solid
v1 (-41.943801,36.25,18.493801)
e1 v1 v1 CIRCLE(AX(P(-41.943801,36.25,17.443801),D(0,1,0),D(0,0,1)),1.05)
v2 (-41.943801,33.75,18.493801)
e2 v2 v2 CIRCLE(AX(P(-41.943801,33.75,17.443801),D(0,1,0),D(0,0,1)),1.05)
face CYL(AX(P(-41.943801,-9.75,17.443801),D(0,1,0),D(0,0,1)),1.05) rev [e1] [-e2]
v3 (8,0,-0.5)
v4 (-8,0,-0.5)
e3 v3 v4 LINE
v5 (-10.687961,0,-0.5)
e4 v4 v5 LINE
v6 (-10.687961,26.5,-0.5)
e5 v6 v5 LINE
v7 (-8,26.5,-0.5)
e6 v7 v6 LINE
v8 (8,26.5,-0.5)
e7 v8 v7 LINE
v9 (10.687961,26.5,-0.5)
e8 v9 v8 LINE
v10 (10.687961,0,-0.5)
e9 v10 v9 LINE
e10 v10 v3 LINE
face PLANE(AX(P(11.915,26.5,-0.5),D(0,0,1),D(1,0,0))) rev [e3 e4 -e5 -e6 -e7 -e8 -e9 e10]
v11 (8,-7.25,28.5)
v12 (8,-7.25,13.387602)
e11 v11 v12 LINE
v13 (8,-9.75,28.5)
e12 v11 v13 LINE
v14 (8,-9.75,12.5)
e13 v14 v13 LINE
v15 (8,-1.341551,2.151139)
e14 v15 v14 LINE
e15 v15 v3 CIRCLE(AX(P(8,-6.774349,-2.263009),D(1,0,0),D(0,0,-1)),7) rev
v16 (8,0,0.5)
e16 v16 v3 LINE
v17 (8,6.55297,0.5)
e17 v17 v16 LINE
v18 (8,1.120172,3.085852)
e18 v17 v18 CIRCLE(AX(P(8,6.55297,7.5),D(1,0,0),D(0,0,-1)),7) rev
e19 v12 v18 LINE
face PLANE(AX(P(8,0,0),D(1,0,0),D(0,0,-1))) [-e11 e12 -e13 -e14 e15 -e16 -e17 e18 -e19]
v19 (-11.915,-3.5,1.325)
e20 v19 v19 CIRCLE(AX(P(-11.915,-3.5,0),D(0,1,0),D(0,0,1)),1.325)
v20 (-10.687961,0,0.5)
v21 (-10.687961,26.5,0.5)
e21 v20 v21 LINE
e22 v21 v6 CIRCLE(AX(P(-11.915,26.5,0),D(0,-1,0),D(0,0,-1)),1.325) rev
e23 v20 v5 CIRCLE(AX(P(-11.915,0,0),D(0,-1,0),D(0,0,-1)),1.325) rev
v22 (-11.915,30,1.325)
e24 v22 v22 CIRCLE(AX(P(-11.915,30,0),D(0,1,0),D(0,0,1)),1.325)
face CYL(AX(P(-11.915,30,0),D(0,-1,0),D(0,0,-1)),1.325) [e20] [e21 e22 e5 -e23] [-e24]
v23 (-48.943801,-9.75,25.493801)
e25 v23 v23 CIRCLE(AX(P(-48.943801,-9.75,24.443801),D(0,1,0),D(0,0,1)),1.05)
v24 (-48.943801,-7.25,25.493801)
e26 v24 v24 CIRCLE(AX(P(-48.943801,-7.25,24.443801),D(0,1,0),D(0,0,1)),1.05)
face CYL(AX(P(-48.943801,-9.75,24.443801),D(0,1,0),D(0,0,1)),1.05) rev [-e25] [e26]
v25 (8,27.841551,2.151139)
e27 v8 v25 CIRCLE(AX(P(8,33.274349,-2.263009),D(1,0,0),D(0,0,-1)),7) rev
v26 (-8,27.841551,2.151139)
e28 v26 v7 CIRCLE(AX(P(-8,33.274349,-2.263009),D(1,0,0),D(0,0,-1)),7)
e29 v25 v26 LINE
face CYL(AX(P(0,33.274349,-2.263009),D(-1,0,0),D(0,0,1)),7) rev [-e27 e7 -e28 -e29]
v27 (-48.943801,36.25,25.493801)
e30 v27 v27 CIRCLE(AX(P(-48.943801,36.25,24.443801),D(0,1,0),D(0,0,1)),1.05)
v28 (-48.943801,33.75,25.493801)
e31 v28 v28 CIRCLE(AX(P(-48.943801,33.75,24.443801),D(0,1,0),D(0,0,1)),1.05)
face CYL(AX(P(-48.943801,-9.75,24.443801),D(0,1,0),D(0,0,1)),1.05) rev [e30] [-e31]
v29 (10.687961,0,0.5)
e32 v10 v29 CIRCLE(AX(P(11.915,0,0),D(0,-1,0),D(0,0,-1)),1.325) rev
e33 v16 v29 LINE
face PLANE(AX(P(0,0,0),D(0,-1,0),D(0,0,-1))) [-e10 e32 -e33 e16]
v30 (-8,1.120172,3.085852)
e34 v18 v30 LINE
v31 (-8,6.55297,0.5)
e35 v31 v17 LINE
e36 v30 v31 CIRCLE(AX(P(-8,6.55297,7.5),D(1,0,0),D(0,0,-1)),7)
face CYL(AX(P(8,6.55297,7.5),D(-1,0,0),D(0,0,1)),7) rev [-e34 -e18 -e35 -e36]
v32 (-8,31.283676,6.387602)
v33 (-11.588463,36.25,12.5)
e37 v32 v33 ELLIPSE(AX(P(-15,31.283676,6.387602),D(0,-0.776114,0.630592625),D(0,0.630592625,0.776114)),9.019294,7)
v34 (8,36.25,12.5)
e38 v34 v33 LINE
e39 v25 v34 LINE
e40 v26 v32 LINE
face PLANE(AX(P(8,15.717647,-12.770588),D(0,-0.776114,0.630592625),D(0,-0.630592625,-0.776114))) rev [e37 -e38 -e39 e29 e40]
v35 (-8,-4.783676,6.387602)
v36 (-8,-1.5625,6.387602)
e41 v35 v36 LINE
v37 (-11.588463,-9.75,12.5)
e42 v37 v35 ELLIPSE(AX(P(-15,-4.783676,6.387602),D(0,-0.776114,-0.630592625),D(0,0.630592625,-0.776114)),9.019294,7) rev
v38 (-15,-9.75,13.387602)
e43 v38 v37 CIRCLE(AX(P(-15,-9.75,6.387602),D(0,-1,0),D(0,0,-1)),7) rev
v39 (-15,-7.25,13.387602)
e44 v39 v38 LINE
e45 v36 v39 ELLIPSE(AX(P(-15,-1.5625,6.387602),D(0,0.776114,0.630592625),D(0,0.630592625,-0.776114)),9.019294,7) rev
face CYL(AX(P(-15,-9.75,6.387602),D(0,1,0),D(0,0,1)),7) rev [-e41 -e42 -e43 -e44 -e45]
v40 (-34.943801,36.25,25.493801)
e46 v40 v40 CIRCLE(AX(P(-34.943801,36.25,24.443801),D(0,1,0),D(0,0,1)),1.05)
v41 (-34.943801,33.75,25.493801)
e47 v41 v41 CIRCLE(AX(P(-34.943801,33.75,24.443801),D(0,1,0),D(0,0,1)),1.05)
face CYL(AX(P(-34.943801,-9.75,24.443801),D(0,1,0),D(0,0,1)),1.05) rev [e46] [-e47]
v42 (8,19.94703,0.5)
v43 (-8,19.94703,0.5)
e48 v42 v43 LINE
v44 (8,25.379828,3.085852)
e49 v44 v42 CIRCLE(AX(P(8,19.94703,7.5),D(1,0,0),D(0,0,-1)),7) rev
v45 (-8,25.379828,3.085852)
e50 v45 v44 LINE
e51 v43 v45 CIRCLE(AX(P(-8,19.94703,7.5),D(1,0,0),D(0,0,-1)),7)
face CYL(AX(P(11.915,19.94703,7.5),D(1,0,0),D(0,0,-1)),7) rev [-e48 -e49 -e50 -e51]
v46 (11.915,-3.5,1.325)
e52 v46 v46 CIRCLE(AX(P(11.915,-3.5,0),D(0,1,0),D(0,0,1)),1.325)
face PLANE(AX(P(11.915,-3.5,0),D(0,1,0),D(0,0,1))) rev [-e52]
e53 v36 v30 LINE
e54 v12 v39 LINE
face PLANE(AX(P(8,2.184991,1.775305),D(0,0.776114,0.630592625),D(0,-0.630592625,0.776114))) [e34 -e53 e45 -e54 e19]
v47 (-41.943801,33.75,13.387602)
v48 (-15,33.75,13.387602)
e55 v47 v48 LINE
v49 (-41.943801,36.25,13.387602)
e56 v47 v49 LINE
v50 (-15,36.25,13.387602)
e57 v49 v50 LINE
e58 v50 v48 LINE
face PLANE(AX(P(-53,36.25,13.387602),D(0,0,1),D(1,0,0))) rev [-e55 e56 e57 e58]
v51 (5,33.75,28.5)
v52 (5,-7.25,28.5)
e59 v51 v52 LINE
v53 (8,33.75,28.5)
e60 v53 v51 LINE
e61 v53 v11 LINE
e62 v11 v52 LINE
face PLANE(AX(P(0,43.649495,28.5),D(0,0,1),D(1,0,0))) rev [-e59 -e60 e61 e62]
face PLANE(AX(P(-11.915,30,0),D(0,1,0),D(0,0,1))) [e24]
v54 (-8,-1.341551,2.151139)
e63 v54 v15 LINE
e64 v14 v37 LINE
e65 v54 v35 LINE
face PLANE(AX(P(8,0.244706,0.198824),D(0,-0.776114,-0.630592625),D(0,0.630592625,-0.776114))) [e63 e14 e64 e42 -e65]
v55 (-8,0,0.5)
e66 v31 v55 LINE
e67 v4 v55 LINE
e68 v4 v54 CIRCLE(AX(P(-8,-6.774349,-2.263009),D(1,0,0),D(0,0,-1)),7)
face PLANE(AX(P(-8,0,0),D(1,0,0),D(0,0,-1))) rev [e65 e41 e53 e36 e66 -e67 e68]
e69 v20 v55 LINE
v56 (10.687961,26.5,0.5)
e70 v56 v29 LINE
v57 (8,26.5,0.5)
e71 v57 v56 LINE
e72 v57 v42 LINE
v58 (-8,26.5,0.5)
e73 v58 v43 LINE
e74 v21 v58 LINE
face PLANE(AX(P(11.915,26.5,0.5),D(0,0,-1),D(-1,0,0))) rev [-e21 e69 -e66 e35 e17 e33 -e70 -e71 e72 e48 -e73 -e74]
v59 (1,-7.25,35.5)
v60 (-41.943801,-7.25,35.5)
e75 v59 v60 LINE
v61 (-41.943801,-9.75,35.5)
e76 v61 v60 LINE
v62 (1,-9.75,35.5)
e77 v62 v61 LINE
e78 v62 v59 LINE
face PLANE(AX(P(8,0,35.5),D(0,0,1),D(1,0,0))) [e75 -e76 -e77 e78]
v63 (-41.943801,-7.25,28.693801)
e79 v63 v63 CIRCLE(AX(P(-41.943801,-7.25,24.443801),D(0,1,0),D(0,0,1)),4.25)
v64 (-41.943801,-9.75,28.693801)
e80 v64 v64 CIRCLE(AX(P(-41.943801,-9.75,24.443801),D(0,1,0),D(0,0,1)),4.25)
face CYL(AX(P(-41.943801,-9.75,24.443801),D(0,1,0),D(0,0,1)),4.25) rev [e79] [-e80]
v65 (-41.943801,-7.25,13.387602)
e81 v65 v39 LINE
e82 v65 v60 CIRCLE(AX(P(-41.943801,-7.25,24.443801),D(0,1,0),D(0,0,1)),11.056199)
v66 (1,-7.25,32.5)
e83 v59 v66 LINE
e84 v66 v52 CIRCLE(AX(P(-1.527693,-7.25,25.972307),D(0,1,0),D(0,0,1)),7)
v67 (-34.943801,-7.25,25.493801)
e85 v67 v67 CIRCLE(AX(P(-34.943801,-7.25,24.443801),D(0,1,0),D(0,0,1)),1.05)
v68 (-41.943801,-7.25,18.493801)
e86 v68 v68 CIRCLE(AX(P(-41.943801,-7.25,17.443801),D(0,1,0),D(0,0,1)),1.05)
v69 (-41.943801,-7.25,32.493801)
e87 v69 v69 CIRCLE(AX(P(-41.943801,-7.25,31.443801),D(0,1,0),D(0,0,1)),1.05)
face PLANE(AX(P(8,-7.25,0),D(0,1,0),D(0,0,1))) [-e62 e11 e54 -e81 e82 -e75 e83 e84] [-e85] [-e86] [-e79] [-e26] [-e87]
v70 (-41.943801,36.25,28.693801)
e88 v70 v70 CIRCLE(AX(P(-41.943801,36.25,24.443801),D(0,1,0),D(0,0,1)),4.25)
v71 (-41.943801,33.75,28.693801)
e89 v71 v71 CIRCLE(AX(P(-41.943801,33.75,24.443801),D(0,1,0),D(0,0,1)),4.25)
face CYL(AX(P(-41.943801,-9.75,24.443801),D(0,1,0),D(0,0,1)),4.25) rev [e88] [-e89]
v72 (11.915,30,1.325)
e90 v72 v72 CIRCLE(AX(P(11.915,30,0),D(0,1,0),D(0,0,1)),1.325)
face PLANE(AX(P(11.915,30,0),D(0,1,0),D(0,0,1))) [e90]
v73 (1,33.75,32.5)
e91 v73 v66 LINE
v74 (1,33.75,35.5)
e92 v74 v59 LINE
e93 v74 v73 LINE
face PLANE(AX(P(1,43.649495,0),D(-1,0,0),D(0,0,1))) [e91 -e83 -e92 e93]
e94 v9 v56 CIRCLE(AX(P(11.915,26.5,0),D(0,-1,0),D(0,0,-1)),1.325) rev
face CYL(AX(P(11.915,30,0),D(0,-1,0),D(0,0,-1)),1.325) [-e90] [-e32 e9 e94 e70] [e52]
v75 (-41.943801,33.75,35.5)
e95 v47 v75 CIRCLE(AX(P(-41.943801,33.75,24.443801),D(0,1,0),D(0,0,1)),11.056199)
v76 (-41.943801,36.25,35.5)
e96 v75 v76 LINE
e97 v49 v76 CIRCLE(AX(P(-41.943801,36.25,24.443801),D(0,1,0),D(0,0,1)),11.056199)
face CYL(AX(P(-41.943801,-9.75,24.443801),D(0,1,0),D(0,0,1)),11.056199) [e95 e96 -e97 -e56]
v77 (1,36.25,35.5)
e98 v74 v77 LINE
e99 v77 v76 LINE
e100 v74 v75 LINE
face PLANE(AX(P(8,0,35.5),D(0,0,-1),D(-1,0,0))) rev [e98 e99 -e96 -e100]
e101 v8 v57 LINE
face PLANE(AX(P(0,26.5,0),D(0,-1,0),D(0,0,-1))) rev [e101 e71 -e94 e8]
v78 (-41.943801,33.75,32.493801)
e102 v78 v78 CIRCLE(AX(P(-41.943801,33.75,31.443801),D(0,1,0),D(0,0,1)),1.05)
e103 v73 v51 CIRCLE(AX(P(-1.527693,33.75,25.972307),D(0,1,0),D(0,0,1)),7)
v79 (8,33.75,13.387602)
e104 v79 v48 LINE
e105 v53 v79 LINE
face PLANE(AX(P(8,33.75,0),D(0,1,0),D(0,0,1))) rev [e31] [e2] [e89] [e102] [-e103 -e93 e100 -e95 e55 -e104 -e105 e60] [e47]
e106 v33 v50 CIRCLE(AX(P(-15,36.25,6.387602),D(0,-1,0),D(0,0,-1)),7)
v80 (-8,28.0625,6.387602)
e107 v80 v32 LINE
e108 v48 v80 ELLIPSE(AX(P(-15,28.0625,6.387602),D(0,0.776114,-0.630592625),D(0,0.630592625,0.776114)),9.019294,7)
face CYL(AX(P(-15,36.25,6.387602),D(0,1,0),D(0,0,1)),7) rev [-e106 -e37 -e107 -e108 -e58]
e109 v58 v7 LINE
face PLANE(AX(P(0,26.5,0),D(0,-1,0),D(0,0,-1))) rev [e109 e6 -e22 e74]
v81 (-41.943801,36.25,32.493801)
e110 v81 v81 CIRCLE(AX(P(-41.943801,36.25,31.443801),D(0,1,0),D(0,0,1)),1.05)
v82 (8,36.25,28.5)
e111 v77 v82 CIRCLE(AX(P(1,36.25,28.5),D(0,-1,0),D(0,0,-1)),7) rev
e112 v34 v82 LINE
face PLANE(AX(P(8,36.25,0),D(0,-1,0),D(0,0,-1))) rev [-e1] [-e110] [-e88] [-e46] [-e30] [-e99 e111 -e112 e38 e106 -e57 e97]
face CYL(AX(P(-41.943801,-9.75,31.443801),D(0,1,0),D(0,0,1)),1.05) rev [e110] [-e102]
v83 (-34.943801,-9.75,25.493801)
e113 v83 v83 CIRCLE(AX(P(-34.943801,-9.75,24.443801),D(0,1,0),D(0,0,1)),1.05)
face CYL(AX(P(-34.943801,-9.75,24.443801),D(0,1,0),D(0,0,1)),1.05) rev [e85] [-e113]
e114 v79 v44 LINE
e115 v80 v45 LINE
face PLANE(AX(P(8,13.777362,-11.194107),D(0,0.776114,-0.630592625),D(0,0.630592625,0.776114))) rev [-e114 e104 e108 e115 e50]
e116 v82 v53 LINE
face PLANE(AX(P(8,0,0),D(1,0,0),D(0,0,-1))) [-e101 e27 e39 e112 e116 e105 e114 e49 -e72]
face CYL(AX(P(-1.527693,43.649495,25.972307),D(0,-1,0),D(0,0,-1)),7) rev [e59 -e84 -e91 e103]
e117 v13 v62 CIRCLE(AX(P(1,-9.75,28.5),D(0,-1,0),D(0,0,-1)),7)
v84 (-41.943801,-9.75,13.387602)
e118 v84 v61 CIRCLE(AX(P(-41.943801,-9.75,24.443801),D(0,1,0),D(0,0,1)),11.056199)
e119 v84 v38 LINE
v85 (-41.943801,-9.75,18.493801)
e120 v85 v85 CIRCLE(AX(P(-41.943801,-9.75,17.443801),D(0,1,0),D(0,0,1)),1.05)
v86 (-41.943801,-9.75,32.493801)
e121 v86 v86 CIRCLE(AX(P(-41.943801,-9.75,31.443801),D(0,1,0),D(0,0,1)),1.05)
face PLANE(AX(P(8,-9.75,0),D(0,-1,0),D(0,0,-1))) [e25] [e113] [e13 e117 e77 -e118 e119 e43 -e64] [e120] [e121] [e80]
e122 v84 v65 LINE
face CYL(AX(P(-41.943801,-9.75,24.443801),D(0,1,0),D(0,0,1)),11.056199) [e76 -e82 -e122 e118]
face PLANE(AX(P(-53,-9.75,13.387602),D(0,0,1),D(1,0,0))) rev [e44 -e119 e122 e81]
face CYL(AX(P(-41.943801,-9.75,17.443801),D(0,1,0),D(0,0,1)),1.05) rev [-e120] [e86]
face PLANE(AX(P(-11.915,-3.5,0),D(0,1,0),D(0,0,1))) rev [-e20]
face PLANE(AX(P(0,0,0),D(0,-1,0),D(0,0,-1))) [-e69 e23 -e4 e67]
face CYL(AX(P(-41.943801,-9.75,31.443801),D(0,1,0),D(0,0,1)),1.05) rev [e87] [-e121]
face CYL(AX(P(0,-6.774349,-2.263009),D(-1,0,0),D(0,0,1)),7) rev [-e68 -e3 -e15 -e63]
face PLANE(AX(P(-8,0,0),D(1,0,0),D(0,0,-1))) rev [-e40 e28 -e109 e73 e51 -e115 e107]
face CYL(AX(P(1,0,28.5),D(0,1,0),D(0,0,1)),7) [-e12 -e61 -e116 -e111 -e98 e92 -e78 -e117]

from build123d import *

# Parameters (mm, degrees)
SKETCH1_W           = 23.83
SKETCH1_H           = 1
BOSS_EXTRUDE1_DEPTH = 26.5
SKETCH2_R           = 1.325
BOSS_EXTRUDE2_DEPTH = 16.75
BOSS_EXTRUDE4_DEPTH = 8
SKETCH5_W           = 22.112398437
SKETCH5_H           = 2.5
BOSS_EXTRUDE5_DEPTH = 45
SKETCH6_R           = 4.25
SKETCH6_R_2         = 1.05
CUT_EXTRUDE1_DEPTH  = 79.646360374
FILLET1_R           = 7
FILLET2_R           = 7
FILLET3_R           = 7
BOSS_EXTRUDE6_START = 41
BOSS_EXTRUDE6_DEPTH = 41


with BuildPart() as part:
    # Sketch1 → Boss-Extrude1 (new body)
    with BuildSketch(Plane(origin=(0, 0, 0), x_dir=(1, 0, 0), z_dir=(0, 1, 0))):
        Rectangle(SKETCH1_W, SKETCH1_H)
    extrude(amount=BOSS_EXTRUDE1_DEPTH)

    # Sketch2 → Boss-Extrude2 (add, symmetric)
    with BuildSketch(Plane(origin=(0, 13.25, 0), x_dir=(1, 0, 0), z_dir=(0, 1, 0))):
        with Locations(Location((-11.915, 0, 0), (0, 0, 270))):
            Circle(SKETCH2_R)
        with Locations(Location((11.915, 0, 0), (0, 0, 270))):
            Circle(SKETCH2_R)
    extrude(amount=BOSS_EXTRUDE2_DEPTH, both=True)

    # Sketch4 → Boss-Extrude4 (add, symmetric)
    with BuildSketch(Plane(origin=(0, 0, 0), x_dir=(0, 0, -1), z_dir=(1, 0, 0))):
        Polygon((-0.5, 23.27882373), (-0.5, 26.5), (-12.5, 36.25), (-35.5, 36.25), (-35.5, 33.75), (-13.387601563, 33.75), align=None)
        Polygon((-0.5, 0), (-0.5, 3.22117627), (-13.387601563, -7.25), (-35.5, -7.25), (-35.5, -9.75), (-12.5, -9.75), align=None)
    extrude(amount=BOSS_EXTRUDE4_DEPTH, both=True)

    # Sketch5 → Boss-Extrude5 (add)
    with BuildSketch(Plane.ZY.offset(8)):
        with Locations((24.443800782, 35)):
            Rectangle(SKETCH5_W, SKETCH5_H)
        with Locations((24.443800782, -8.5)):
            Rectangle(SKETCH5_W, SKETCH5_H)
    extrude(amount=BOSS_EXTRUDE5_DEPTH)

    # Sketch6 → Cut-Extrude1 (cut, through all)
    with BuildSketch(Plane(origin=(0, 36.25, 0), x_dir=(1, 0, 0), z_dir=(0, 1, 0))):
        with Locations(Location((-41.943800782, -24.443800782, 0), (0, 0, 270))):
            Circle(SKETCH6_R)
        with Locations(Location((-48.943800782, -24.443800782, 0), (0, 0, 270))):
            Circle(SKETCH6_R_2)
        with Locations(Location((-41.943800782, -17.443800782, 0), (0, 0, 270))):
            Circle(SKETCH6_R_2)
        with Locations(Location((-34.943800782, -24.443800782, 0), (0, 0, 270))):
            Circle(SKETCH6_R_2)
        with Locations(Location((-41.943800782, -31.443800782, 0), (0, 0, 270))):
            Circle(SKETCH6_R_2)
        with BuildLine():
            ThreePointArc((-53, -24.443800782), (-49.761714223, -16.62588734), (-41.943800782, -13.387601563))
            Line((-41.943800782, -13.387601563), (-53, -13.387601563))
            Line((-53, -13.387601563), (-53, -24.443800782))
        make_face()
        with BuildLine():
            ThreePointArc((-41.943800782, -35.5), (-49.761714223, -32.261714223), (-53, -24.443800782))
            Line((-53, -24.443800782), (-53, -35.5))
            Line((-53, -35.5), (-41.943800782, -35.5))
        make_face()
    extrude(amount=-CUT_EXTRUDE1_DEPTH, mode=Mode.SUBTRACT)

    # Fillet1
    # the kernel refuses this fillet: 7 mm, written as the material it adds along each edge
    with BuildSketch(Plane(origin=(-8, -9.75, 13.387601563), x_dir=(-1, 0, 0), z_dir=(0, 1, 0))) as fillet1_piece_1_section:
        with BuildLine():
            CenterArc((FILLET1_R, -FILLET1_R), FILLET1_R, 90, 90)
            Line((0, -FILLET1_R), (0, 0))
            Line((0, 0), (FILLET1_R, 0))
        make_face()
    fillet1_piece_1 = extrude(amount=2.5, mode=Mode.PRIVATE)
    fillet1_piece_1 = split(fillet1_piece_1, bisect_by=Plane(origin=(-9.983413871, -9.198966646, 11.821805103), z_dir=(0, 0.7761140001162655, 0.6305926250944658)), keep=Keep.TOP, mode=Mode.PRIVATE)
    fillet1_piece_1 = split(fillet1_piece_1, bisect_by=Plane(origin=(-9.983413871, -7.258681646, 13.398286665), z_dir=(0, -0.7761140001162655, -0.6305926250944658)), keep=Keep.TOP, mode=Mode.PRIVATE)
    add(fillet1_piece_1)
    with BuildSketch(Plane(origin=(-8, -9.75, 13.387601563), x_dir=(-1, 0, 0), z_dir=(0, 1, 0))) as fillet1_piece_2_section:
        with BuildLine():
            CenterArc((FILLET1_R, -FILLET1_R), FILLET1_R, 90, 90)
            Line((0, -FILLET1_R), (0, 0))
            Line((0, 0), (FILLET1_R, 0))
        make_face()
    fillet1_piece_2 = extrude(amount=20, mode=Mode.PRIVATE)
    fillet1_piece_2 = split(fillet1_piece_2, bisect_by=Plane(origin=(-8.790191319, -7.296205837, 9.479945645), z_dir=(0, 0.7761140001162655, 0.6305926250944658)), keep=Keep.TOP, mode=Mode.PRIVATE)
    fillet1_piece_2 = split(fillet1_piece_2, bisect_by=Plane(origin=(-8.790191319, -7.25, 10.538925052), z_dir=(0, 1, 0)), keep=Keep.TOP, mode=Mode.PRIVATE)
    fillet1_piece_2 = split(fillet1_piece_2, bisect_by=Plane(origin=(-8.790191319, -5.355920836, 11.056427208), z_dir=(0, -0.7761140001162655, -0.6305926250944658)), keep=Keep.TOP, mode=Mode.PRIVATE)
    add(fillet1_piece_2)
    with BuildSketch(Plane(origin=(-8, 36.25, 13.387601563), x_dir=(0, 0, -1), z_dir=(0, -1, 0))) as fillet1_piece_3_section:
        with BuildLine():
            CenterArc((FILLET1_R, -FILLET1_R), FILLET1_R, 90, 90)
            Line((0, -FILLET1_R), (0, 0))
            Line((0, 0), (FILLET1_R, 0))
        make_face()
    fillet1_piece_3 = extrude(amount=2.5, mode=Mode.PRIVATE)
    fillet1_piece_3 = split(fillet1_piece_3, bisect_by=Plane(origin=(-9.983413871, 35.698966646, 11.821805103), z_dir=(0, -0.7761140001162655, 0.6305926250944659)), keep=Keep.TOP, mode=Mode.PRIVATE)
    fillet1_piece_3 = split(fillet1_piece_3, bisect_by=Plane(origin=(-9.983413871, 33.758681646, 13.398286666), z_dir=(0, 0.7761140001162657, -0.6305926250944655)), keep=Keep.TOP, mode=Mode.PRIVATE)
    add(fillet1_piece_3)
    with BuildSketch(Plane(origin=(-8, 36.25, 13.387601563), x_dir=(0, 0, -1), z_dir=(0, -1, 0))) as fillet1_piece_4_section:
        with BuildLine():
            CenterArc((FILLET1_R, -FILLET1_R), FILLET1_R, 90, 90)
            Line((0, -FILLET1_R), (0, 0))
            Line((0, 0), (FILLET1_R, 0))
        make_face()
    fillet1_piece_4 = extrude(amount=20, mode=Mode.PRIVATE)
    fillet1_piece_4 = split(fillet1_piece_4, bisect_by=Plane(origin=(-8.790191317, 33.796205836, 9.479945645), z_dir=(0, -0.7761140001162655, 0.6305926250944659)), keep=Keep.TOP, mode=Mode.PRIVATE)
    fillet1_piece_4 = split(fillet1_piece_4, bisect_by=Plane(origin=(-8.790191317, 31.855920836, 11.056427207), z_dir=(0, 0.7761140001162657, -0.6305926250944655)), keep=Keep.TOP, mode=Mode.PRIVATE)
    fillet1_piece_4 = split(fillet1_piece_4, bisect_by=Plane(origin=(-8.790191317, 33.75, 10.538925051), z_dir=(0, -1, 0)), keep=Keep.TOP, mode=Mode.PRIVATE)
    add(fillet1_piece_4)
    # the kernel refuses this fillet: 7 mm, written as the material it takes off along each edge
    with BuildSketch(Plane(origin=(8, 10.25, 35.5), x_dir=(0, 0, -1), z_dir=(0, -1, 0))) as fillet1_2_piece_1:
        with BuildLine():
            CenterArc((FILLET1_R, -FILLET1_R), FILLET1_R, 90, 90)
            Line((0, -FILLET1_R), (0, 0))
            Line((0, 0), (FILLET1_R, 0))
        make_face()
    extrude(amount=37.5, mode=Mode.SUBTRACT)
    with BuildSketch(Plane(origin=(8, 53.75, 35.5), x_dir=(-1, 0, 0), z_dir=(0, -1, 0))) as fillet1_2_piece_2:
        with BuildLine():
            CenterArc((FILLET1_R, FILLET1_R), FILLET1_R, 180, 90)
            Line((0, FILLET1_R), (0, 0))
            Line((0, 0), (FILLET1_R, 0))
        make_face()
    extrude(amount=37.5, mode=Mode.SUBTRACT)

    # Fillet2
    fillet2_edges = [part.edges().sort_by_distance(p)[0] for p in [
        (0, 23.27882373, 0.5),
        (0, 3.22117627, 0.5),
    ]]
    fillet(fillet2_edges, radius=FILLET2_R)

    # Fillet3
    # the kernel refuses this fillet: 7 mm, written as the material it adds along each edge
    with BuildSketch(Plane(origin=(-8, 26.5, 0.5), x_dir=(0, 0.6305926250951525, 0.7761140001157076), z_dir=(1, 0, 0))) as fillet3_piece_1:
        with BuildLine():
            CenterArc((2.127444109, -7), FILLET3_R, 90, 24.506345334)
            Line((-0.776114, -0.630592625), (0, 0))
            Line((0, 0), (2.127444109, 0))
        make_face()
    extrude(amount=16)
    with BuildSketch(Plane(origin=(8, 0, 0.5), x_dir=(0, 0, -1), z_dir=(-1, 0, 0))) as fillet3_piece_2:
        with BuildLine():
            CenterArc((2.763009218, 6.774348566), FILLET3_R, 230.906141114, 24.506345334)
            Line((-1.651139157, 1.341550565), (0, 0))
            Line((0, 0), (1, 0))
        make_face()
    extrude(amount=16)

    # Sketch8 → Boss-Extrude6 (add)
    with BuildSketch(Plane(origin=(0, -7.25, 0), x_dir=(1, 0, 0), z_dir=(0, 1, 0)).offset(BOSS_EXTRUDE6_START)):
        with BuildLine():
            ThreePointArc((1, -35.5), (5.949747468, -33.449747468), (8, -28.5))
            Line((8, -28.5), (5, -28.5))
            ThreePointArc((5, -28.5), (3.422054899, -30.922054899), (1, -32.5))
            Line((1, -32.5), (1, -35.5))
        make_face()
    extrude(amount=-BOSS_EXTRUDE6_DEPTH)


solid = part.part
